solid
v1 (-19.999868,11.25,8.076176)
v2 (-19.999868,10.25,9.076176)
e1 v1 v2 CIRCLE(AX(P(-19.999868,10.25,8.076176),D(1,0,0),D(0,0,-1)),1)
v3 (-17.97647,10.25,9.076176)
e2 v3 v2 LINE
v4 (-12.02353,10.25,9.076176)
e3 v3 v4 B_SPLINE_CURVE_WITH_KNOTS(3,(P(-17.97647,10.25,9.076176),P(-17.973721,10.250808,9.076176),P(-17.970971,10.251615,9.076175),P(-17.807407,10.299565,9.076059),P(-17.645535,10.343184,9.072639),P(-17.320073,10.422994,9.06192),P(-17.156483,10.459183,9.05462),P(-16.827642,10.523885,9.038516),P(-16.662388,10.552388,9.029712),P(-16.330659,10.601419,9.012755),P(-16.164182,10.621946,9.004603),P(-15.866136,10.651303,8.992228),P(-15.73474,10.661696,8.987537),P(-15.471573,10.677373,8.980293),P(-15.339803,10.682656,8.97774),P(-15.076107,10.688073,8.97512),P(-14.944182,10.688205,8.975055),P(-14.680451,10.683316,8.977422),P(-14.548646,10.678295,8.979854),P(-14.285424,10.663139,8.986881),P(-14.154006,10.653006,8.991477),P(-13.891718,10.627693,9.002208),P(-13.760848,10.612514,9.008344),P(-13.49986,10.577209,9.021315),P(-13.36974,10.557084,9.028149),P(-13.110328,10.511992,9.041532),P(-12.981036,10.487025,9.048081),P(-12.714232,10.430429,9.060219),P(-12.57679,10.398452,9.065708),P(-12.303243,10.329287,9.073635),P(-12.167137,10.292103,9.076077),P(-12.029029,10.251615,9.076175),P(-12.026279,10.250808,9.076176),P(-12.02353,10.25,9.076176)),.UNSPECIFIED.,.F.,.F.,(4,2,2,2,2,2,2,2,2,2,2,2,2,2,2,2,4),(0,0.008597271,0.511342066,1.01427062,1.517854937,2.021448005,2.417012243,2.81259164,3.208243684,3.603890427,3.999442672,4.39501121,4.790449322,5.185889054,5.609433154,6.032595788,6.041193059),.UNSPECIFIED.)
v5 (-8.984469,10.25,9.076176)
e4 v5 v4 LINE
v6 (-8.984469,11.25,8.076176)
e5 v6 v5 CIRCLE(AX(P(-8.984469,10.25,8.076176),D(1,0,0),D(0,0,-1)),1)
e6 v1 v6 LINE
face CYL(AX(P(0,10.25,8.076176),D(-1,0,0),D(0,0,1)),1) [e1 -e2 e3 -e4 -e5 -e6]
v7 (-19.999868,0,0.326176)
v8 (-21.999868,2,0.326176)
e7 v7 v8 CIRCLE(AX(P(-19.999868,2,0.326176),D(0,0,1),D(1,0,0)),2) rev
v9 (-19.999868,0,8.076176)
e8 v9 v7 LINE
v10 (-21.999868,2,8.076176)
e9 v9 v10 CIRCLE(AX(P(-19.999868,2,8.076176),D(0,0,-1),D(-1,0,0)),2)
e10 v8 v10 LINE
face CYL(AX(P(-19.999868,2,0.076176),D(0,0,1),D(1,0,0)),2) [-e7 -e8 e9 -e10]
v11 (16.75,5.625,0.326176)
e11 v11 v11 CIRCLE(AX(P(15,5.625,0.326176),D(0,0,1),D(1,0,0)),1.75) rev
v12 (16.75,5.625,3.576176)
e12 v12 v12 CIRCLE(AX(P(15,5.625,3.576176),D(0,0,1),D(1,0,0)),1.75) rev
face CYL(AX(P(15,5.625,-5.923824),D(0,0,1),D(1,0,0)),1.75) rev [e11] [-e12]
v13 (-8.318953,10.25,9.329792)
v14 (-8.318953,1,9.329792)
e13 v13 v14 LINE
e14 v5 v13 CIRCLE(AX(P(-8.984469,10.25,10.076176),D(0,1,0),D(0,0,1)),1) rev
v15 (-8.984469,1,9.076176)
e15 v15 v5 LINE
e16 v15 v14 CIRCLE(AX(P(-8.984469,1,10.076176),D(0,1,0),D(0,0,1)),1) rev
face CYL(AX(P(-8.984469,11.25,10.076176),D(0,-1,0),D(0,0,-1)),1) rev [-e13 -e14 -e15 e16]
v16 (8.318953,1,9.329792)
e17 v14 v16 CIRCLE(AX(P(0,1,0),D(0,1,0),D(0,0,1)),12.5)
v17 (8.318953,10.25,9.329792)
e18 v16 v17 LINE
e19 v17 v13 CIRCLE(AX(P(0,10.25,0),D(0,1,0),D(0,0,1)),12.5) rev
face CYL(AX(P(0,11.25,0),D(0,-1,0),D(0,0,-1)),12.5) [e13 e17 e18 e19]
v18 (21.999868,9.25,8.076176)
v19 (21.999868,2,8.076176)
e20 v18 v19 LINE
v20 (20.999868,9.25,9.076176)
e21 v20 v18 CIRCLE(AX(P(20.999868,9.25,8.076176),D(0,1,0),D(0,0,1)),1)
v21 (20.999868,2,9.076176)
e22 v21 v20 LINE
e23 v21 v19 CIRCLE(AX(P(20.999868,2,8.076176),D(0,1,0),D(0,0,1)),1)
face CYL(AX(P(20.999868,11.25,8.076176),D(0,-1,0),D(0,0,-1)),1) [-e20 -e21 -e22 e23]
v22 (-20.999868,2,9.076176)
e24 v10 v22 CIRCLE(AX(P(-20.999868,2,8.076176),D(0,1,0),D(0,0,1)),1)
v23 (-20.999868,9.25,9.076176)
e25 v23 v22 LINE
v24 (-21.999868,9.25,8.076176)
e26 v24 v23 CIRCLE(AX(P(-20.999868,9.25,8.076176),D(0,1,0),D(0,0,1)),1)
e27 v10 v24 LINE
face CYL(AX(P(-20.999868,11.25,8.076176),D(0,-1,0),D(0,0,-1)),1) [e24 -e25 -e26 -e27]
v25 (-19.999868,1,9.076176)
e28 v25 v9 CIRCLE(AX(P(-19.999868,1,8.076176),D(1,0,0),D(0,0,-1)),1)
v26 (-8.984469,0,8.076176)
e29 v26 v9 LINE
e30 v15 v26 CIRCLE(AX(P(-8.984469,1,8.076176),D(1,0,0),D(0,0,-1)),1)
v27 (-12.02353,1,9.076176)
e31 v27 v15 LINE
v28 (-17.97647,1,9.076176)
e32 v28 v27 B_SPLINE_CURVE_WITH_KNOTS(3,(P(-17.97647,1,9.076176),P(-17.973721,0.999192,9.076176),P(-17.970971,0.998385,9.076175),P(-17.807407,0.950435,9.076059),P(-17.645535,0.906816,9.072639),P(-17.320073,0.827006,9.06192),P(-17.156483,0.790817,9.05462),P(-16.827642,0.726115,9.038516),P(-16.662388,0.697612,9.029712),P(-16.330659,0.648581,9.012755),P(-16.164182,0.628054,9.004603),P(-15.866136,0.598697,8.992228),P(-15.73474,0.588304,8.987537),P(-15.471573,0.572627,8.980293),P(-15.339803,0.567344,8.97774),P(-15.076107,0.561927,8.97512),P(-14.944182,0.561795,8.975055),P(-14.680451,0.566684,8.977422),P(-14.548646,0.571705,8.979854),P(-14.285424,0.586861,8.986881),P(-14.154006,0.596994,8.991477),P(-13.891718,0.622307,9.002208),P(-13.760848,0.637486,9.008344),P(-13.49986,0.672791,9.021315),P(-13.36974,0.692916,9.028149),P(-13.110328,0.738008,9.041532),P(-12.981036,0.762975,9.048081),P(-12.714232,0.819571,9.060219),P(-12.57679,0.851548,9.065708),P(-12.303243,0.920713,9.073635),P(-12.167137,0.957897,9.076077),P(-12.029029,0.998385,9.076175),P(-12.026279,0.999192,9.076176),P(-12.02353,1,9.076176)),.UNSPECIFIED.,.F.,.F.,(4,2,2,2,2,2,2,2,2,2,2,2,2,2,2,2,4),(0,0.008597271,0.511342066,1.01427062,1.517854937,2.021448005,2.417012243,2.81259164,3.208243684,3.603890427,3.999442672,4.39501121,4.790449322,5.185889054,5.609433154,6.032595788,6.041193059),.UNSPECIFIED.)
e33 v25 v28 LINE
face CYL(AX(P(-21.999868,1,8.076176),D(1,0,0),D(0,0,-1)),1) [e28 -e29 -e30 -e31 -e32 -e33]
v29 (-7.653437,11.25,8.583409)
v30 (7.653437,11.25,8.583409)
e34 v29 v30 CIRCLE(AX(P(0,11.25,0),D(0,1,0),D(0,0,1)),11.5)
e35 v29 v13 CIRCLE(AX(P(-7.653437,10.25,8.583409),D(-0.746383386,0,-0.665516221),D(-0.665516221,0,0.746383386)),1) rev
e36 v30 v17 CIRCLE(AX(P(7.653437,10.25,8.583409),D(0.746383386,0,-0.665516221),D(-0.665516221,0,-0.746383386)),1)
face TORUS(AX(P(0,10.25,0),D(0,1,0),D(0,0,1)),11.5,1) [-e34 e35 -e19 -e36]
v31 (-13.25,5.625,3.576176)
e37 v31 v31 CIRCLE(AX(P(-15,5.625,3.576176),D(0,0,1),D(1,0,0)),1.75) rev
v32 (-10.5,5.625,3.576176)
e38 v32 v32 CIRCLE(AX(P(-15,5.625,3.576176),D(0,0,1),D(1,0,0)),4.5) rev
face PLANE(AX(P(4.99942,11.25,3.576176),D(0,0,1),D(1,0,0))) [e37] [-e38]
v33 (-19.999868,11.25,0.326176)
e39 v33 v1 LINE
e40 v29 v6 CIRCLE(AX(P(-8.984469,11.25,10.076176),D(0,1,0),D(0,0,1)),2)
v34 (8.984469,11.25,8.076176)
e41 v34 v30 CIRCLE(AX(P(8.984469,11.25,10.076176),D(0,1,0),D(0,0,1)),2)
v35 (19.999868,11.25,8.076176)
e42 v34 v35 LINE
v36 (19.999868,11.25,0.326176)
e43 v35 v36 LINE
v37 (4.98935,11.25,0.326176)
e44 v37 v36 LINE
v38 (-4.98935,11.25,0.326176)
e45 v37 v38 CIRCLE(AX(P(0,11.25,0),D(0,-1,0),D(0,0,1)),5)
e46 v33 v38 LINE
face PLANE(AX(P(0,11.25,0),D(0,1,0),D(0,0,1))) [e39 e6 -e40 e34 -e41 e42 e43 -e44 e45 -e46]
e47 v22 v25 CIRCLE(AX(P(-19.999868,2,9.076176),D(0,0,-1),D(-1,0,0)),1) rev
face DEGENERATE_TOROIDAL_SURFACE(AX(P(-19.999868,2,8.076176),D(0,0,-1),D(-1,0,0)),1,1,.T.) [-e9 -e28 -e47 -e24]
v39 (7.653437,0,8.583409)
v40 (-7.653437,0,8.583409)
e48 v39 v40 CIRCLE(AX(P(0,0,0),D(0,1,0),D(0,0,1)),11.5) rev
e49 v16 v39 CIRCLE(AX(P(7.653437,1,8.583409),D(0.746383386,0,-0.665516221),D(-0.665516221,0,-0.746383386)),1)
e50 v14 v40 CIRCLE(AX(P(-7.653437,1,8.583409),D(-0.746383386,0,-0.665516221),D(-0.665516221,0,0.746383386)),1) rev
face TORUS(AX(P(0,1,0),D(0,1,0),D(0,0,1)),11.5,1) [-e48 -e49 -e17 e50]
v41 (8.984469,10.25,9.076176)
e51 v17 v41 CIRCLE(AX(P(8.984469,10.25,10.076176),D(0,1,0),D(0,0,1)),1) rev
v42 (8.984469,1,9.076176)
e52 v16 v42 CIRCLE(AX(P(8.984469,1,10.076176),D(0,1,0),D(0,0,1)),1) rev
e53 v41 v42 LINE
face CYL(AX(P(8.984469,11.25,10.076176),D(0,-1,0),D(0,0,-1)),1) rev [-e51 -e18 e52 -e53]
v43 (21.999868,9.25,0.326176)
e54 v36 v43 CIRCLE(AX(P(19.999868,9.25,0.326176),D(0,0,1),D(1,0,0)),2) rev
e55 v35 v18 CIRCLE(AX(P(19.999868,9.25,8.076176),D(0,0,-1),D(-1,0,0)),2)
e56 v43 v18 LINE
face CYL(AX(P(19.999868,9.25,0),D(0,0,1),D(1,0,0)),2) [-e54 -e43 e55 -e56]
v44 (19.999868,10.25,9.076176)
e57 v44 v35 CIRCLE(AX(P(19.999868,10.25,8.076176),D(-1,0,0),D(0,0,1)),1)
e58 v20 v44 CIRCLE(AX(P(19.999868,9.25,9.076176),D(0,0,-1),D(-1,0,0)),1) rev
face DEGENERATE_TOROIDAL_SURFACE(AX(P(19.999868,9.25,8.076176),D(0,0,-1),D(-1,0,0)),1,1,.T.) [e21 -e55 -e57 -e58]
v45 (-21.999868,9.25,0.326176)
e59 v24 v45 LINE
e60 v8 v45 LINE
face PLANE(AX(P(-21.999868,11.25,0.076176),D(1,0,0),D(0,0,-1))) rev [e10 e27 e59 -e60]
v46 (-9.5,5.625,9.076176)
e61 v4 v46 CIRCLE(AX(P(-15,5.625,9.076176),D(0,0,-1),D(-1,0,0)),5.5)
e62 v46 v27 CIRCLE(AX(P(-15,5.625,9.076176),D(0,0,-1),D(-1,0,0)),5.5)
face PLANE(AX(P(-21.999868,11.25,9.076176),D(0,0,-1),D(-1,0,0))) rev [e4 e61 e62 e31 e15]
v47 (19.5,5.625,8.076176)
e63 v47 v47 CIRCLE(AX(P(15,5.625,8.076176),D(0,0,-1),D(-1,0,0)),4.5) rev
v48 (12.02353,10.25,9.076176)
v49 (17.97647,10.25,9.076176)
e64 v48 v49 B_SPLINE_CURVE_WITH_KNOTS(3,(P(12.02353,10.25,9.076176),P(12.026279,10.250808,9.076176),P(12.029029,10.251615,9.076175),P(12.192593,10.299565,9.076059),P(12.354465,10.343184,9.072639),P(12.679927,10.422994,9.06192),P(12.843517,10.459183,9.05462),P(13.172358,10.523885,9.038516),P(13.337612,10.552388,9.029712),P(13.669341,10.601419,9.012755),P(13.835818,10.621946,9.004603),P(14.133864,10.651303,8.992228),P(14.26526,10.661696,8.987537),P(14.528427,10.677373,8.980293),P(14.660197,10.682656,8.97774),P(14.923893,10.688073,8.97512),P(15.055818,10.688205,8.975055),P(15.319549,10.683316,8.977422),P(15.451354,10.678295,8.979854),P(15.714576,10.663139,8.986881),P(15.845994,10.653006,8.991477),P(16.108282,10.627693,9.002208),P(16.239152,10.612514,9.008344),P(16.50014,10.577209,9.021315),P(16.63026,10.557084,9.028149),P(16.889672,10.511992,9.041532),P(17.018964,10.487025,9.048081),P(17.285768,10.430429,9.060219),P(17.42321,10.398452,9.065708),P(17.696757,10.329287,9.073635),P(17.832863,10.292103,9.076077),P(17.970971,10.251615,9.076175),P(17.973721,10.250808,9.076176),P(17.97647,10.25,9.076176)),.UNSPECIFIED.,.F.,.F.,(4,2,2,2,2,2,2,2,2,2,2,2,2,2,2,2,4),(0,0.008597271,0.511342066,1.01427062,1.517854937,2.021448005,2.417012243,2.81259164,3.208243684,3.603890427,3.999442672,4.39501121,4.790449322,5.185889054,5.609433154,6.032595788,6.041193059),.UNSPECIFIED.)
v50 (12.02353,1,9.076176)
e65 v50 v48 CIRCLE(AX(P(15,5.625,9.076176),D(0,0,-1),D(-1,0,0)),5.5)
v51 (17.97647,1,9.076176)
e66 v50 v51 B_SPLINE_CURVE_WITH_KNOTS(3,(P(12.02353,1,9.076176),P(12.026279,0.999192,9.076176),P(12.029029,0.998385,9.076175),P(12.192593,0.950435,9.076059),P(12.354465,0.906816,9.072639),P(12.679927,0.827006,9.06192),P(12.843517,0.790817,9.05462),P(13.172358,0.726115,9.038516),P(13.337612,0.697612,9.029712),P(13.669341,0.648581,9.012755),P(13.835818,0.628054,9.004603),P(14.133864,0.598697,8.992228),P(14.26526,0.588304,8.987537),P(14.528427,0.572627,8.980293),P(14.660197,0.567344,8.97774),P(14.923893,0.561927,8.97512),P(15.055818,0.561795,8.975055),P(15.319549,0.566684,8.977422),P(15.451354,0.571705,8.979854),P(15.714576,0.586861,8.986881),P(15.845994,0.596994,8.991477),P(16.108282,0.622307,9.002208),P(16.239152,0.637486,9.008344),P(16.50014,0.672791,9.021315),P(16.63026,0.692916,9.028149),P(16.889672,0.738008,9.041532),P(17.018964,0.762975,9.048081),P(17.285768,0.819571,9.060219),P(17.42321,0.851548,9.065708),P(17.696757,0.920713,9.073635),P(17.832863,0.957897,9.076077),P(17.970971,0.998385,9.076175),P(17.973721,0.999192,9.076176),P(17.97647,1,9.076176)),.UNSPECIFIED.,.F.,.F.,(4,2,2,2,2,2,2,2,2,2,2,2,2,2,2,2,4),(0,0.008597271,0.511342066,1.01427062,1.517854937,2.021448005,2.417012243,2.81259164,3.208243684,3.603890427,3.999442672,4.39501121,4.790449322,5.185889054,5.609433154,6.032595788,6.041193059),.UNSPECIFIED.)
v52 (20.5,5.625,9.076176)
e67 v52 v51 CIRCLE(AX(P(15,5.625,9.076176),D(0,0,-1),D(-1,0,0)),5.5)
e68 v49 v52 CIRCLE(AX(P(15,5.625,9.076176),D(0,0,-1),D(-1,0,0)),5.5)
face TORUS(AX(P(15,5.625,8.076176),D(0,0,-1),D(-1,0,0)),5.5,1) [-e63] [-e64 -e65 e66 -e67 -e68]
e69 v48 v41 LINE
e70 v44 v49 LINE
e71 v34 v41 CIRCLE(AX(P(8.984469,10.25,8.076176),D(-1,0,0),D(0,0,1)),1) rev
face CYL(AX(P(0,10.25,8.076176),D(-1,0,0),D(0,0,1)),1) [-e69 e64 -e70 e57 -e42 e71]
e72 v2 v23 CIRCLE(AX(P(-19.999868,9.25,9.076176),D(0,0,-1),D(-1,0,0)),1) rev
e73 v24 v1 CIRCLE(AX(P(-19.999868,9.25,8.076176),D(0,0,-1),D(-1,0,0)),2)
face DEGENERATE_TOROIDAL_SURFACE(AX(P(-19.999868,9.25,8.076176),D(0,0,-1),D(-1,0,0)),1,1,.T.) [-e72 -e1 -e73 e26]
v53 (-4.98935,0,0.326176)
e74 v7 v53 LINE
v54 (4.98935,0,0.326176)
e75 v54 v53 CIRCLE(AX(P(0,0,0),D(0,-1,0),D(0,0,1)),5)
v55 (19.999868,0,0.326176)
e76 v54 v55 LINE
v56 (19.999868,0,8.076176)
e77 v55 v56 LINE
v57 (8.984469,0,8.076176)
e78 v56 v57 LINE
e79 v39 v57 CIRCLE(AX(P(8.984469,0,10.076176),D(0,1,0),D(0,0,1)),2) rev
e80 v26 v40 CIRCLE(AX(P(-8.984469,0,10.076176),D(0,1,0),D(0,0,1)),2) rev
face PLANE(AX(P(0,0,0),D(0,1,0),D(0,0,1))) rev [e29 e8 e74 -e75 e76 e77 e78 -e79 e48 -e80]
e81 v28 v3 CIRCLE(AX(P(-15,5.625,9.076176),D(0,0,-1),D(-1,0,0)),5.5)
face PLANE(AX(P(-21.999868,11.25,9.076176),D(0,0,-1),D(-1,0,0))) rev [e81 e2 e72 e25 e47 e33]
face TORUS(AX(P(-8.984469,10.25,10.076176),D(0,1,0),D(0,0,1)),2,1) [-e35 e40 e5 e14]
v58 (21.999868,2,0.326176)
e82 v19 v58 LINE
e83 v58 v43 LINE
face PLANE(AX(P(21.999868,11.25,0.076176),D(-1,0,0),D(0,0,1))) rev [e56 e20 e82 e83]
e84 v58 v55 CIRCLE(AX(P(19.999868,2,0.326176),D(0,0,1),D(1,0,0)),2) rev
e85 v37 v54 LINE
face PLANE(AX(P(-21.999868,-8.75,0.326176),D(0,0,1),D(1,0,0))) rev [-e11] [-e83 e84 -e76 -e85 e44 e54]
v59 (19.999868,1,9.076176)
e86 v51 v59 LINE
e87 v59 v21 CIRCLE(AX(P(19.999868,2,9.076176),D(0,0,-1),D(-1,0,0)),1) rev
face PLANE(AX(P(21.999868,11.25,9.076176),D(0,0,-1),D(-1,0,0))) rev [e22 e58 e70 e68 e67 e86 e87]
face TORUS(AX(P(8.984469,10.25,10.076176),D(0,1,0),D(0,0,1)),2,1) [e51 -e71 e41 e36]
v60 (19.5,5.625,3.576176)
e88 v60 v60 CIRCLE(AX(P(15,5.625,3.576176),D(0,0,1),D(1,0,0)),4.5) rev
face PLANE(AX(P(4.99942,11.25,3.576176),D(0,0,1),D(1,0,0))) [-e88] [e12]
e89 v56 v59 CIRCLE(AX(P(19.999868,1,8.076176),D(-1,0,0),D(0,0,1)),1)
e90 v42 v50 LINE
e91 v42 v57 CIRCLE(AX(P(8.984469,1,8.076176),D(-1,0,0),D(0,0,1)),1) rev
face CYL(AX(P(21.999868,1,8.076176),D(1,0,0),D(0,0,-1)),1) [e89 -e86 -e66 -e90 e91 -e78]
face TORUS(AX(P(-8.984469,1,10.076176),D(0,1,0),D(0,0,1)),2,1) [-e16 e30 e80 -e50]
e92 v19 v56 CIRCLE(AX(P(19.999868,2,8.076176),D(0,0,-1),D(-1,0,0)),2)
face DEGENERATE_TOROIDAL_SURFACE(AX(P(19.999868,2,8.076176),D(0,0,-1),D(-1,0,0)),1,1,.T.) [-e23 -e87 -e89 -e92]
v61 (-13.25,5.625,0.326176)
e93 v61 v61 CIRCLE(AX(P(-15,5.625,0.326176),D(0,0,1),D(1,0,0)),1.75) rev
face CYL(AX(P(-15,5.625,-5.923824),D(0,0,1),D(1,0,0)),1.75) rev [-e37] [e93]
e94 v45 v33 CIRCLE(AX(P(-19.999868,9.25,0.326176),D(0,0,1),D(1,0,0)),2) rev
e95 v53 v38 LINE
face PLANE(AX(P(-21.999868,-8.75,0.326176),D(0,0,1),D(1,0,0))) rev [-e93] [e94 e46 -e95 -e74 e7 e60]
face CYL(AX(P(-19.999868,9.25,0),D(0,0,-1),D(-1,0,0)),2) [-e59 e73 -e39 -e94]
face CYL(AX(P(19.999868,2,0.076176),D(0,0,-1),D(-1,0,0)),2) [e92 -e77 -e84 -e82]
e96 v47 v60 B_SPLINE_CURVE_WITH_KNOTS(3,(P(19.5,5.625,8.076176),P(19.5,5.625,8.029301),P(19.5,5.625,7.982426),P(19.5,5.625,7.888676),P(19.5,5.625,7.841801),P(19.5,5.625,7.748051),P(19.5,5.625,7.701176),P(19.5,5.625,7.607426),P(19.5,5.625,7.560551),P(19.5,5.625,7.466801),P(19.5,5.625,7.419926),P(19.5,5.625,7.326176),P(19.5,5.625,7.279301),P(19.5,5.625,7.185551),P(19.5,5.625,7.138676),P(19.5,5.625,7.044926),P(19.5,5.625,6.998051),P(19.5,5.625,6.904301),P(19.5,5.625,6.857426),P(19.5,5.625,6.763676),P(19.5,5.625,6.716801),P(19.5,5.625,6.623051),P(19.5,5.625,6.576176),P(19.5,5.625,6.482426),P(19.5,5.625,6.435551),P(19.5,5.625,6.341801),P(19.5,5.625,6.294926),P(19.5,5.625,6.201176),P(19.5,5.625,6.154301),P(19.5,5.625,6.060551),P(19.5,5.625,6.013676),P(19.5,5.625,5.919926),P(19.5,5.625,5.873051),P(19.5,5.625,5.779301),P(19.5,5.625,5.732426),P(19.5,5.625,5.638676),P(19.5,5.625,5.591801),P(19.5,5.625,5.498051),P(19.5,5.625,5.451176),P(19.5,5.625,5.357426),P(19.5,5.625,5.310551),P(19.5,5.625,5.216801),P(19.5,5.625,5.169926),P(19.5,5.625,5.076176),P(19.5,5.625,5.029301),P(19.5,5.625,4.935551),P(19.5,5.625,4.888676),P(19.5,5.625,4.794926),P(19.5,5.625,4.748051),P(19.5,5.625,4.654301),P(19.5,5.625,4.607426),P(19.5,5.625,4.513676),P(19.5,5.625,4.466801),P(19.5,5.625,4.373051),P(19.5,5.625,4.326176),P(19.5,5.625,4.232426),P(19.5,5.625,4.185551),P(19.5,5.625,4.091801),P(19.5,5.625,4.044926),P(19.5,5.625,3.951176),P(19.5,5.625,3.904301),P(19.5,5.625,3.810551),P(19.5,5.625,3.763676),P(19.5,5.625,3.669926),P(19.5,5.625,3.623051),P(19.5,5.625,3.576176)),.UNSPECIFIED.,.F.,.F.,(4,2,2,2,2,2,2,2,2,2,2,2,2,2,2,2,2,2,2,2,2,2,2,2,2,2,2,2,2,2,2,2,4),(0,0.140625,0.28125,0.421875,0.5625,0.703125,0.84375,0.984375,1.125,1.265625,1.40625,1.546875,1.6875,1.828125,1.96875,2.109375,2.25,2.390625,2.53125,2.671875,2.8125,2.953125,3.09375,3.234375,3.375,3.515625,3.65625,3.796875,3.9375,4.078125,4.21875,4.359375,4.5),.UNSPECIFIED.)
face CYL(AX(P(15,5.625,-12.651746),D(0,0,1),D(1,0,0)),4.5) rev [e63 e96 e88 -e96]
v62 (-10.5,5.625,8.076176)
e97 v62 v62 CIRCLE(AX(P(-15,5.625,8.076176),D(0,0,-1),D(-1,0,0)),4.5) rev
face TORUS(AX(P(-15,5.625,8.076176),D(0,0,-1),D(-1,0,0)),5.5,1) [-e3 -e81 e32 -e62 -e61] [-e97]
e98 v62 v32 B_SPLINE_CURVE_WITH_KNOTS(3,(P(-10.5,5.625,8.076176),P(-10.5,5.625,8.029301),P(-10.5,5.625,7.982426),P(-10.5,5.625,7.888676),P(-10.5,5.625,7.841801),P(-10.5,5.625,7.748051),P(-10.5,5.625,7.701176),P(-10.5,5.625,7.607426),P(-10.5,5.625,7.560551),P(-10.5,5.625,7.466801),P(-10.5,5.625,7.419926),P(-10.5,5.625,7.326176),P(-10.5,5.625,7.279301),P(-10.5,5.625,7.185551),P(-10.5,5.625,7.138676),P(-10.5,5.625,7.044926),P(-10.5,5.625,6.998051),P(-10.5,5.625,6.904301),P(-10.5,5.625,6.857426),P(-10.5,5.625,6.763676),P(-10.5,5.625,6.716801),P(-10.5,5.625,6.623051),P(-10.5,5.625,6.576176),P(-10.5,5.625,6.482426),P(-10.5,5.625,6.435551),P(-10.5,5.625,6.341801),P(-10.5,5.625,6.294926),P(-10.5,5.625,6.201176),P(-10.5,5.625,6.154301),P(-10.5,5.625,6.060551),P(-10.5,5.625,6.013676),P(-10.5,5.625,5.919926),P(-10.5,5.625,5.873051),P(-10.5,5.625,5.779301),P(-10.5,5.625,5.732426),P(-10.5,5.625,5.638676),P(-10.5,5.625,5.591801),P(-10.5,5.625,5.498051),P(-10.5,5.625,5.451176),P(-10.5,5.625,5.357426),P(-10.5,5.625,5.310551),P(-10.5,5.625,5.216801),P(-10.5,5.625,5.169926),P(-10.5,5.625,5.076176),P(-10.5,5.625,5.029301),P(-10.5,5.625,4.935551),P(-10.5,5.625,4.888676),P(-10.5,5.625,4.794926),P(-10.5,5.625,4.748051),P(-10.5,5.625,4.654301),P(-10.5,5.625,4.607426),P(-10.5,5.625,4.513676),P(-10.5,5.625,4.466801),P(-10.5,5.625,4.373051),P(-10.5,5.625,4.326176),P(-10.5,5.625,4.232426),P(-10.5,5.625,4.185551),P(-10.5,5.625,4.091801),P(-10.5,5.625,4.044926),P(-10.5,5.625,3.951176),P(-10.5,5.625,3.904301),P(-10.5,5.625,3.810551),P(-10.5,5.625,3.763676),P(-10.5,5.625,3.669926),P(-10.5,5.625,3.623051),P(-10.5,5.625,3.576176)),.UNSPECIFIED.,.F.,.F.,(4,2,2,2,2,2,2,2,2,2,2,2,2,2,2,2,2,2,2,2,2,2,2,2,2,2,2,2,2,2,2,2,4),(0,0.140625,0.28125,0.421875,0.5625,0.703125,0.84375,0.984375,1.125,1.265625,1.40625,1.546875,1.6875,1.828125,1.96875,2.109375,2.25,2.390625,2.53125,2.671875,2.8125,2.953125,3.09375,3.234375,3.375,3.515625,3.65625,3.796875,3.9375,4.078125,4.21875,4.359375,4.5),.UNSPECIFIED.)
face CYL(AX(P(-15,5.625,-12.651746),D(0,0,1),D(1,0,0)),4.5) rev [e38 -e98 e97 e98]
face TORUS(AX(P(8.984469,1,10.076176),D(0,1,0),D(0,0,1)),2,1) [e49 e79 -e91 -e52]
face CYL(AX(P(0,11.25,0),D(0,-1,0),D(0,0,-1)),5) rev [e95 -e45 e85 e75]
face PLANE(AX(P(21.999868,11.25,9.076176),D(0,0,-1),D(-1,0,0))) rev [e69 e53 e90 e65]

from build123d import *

# Parameters (mm, degrees)
BOSS_EXTRUDE2_DEPTH = 11.25
SKETCH3_R           = 1.75
CUT_EXTRUDE1_DEPTH  = 15
SKETCH4_R           = 4.5
CUT_EXTRUDE2_DEPTH  = 5.5
FILLET1_R           = 2
FILLET2_R           = 1
SKETCH5_W           = 43.999736238
SKETCH5_H           = 0.25
CUT_EXTRUDE3_DEPTH  = 20


with BuildPart() as part:
    # Sketch2 → Boss-Extrude2 (new body)
    with BuildSketch(Plane(origin=(0, 0, 0), x_dir=(1, 0, 0), z_dir=(0, 1, 0))):
        with BuildLine():
            Line((4.999419692, -0.076175713), (21.999868119, -0.076175713))
            Line((21.999868119, -0.076175713), (21.999868119, -9.076175713))
            Line((21.999868119, -9.076175713), (8.594942375, -9.076175713))
            ThreePointArc((8.594942375, -9.076175713), (0, -12.5), (-8.594942375, -9.076175713))
            Line((-8.594942375, -9.076175713), (-21.999868119, -9.076175713))
            Line((-21.999868119, -9.076175713), (-21.999868119, -0.076175713))
            Line((-21.999868119, -0.076175713), (-4.999419692, -0.076175713))
            ThreePointArc((-4.999419692, -0.076175713), (0, -5), (4.999419692, -0.076175713))
        make_face()
    extrude(amount=BOSS_EXTRUDE2_DEPTH)

    # Sketch3 → Cut-Extrude1 (cut)
    with BuildSketch(Plane.XY.offset(9.076175713)):
        with Locations((15, 5.625)):
            Circle(SKETCH3_R)
        with Locations((-15, 5.625)):
            Circle(SKETCH3_R)
    extrude(amount=-CUT_EXTRUDE1_DEPTH, mode=Mode.SUBTRACT)

    # Sketch4 → Cut-Extrude2 (cut)
    with BuildSketch(Plane.XY.offset(9.076175713)):
        with Locations((15, 5.625)):
            Circle(SKETCH4_R)
        with Locations((-15, 5.625)):
            Circle(SKETCH4_R)
    extrude(amount=-CUT_EXTRUDE2_DEPTH, mode=Mode.SUBTRACT)

    # Fillet1
    fillet1_edges = [part.edges().sort_by_distance(p)[0] for p in [
        (-21.999868119, 11.25, 4.576175713),
        (21.999868119, 11.25, 4.576175713),
        (21.999868119, 0, 4.576175713),
        (-21.999868119, 0, 4.576175713),
    ]]
    fillet(fillet1_edges, radius=FILLET1_R)

    # Fillet2
    # the kernel refuses this fillet: 1 mm, written as the material it adds along each edge
    with BuildSketch(Plane(origin=(8.594942375, 0, 9.076175713), x_dir=(-0.7363214838652496, 0, 0.6766318588408892), z_dir=(0, 1, 0))) as fillet2_piece_1:
        with BuildLine():
            CenterArc((0.389815045, 0.9998876), FILLET2_R, 227.418998023, 41.721940681)
            Line((-0.286816814, 0.263566116), (0, 0))
            ThreePointArc((0, 0), (0.187411079, 0.001404995), (0.374822159, 0))
        make_face()
    extrude(amount=11.25)
    with BuildSketch(Plane(origin=(-8.594942375, 0, 9.076175713), x_dir=(-1, 0, 0), z_dir=(0, 1, 0))) as fillet2_piece_2:
        with BuildLine():
            CenterArc((0.389526613, 1), FILLET2_R, 228.278059319, 41.721940681)
            ThreePointArc((-0.275989608, 0.253616614), (-0.137044139, 0.127842835), (0, 0))
            Line((0, 0), (0.389526613, 0))
        make_face()
    extrude(amount=11.25)
    # the kernel refuses this fillet: 1 mm, written as the material it takes off along each edge
    with BuildSketch(Plane(origin=(15, 5.625, 9.076175713), x_dir=(1, 0, 0), z_dir=(0, -1, 0))) as fillet2_2_piece_1:
        with BuildLine():
            CenterArc((4.5 + FILLET2_R, -FILLET2_R), FILLET2_R, 90, 90)
            Line((4.5, -FILLET2_R), (4.5, 0))
            Line((4.5, 0), (4.5 + FILLET2_R, 0))
        make_face()
    revolve(axis=Axis((15, 5.625, 9.076175713), (0, 0, 1)), mode=Mode.SUBTRACT)
    with BuildSketch(Plane(origin=(-15, 5.625, 9.076175713), x_dir=(1, 0, 0), z_dir=(0, -1, 0))) as fillet2_2_piece_2:
        with BuildLine():
            CenterArc((4.5 + FILLET2_R, -FILLET2_R), FILLET2_R, 90, 90)
            Line((4.5, -FILLET2_R), (4.5, 0))
            Line((4.5, 0), (4.5 + FILLET2_R, 0))
        make_face()
    revolve(axis=Axis((-15, 5.625, 9.076175713), (0, 0, 1)), mode=Mode.SUBTRACT)
    # the kernel refuses this fillet: 1 mm, written as the material it takes off along each edge
    with BuildSketch(Plane(origin=(0, 11.25, 0), x_dir=(0.6655162213477791, 0, 0.7463833861514965), z_dir=(0.7463833861514965, 0, -0.6655162213477791))) as fillet2_3_piece_1:
        with BuildLine():
            CenterArc((12.5 - FILLET2_R, FILLET2_R), FILLET2_R, 270, 90)
            Line((12.5, FILLET2_R), (12.5, 0))
            Line((12.5, 0), (12.5 - FILLET2_R, 0))
        make_face()
    revolve(axis=Axis((0, 11.25, 0), (0, -1, 0)), revolution_arc=83.443881362, mode=Mode.SUBTRACT)
    with BuildSketch(Plane(origin=(19.999868119, 11.25, 9.076175713), x_dir=(0, 0, -1), z_dir=(-1, 0, 0)), Plane(origin=(-8.984468988, 0, 9.076175713), x_dir=(0, 1, 0), z_dir=(-1, 0, 0))) as fillet2_3_piece_2:
        with BuildLine():
            CenterArc((FILLET2_R, FILLET2_R), FILLET2_R, 180, 90)
            Line((0, FILLET2_R), (0, 0))
            Line((0, 0), (FILLET2_R, 0))
        make_face()
    extrude(amount=11.015399131, mode=Mode.SUBTRACT)
    with BuildSketch(Plane(origin=(21.999868119, 2, 9.076175713), x_dir=(-1, 0, 0), z_dir=(0, 1, 0))) as fillet2_3_piece_3:
        with BuildLine():
            CenterArc((FILLET2_R, -FILLET2_R), FILLET2_R, 90, 90)
            Line((0, -FILLET2_R), (0, 0))
            Line((0, 0), (FILLET2_R, 0))
        make_face()
    extrude(amount=7.25, mode=Mode.SUBTRACT)
    with BuildSketch(Plane(origin=(19.999868119, 9.25, 9.076175713), x_dir=(0, 1, 0), z_dir=(-1, 0, 0))) as fillet2_3_piece_4:
        with BuildLine():
            CenterArc((2 - FILLET2_R, FILLET2_R), FILLET2_R, 270, 90)
            Line((2, FILLET2_R), (2, 0))
            Line((2, 0), (2 - FILLET2_R, 0))
        make_face()
    revolve(axis=Axis((19.999868119, 9.25, 9.076175713), (0, 0, -1)), revolution_arc=90, mode=Mode.SUBTRACT)
    with BuildSketch(Plane(origin=(19.999868119, 2, 9.076175713), x_dir=(0, -1, 0), z_dir=(-1, 0, 0))) as fillet2_3_piece_5:
        with BuildLine():
            CenterArc((2 - FILLET2_R, -FILLET2_R), FILLET2_R, 0, 90)
            Line((2 - FILLET2_R, 0), (2, 0))
            Line((2, 0), (2, -FILLET2_R))
        make_face()
    revolve(axis=Axis((19.999868119, 2, 9.076175713), (0, 0, 1)), revolution_arc=90, mode=Mode.SUBTRACT)
    with BuildSketch(Plane(origin=(-8.984468988, 11.25, 9.076175713), x_dir=(0, -1, 0), z_dir=(-1, 0, 0)), Plane(origin=(19.999868119, 0, 9.076175713), x_dir=(0, 0, -1), z_dir=(-1, 0, 0))) as fillet2_3_piece_6:
        with BuildLine():
            CenterArc((FILLET2_R, -FILLET2_R), FILLET2_R, 90, 90)
            Line((0, -FILLET2_R), (0, 0))
            Line((0, 0), (FILLET2_R, 0))
        make_face()
    extrude(amount=11.015399131, mode=Mode.SUBTRACT)
    with BuildSketch(Plane(origin=(-21.999868119, 2, 9.076175713), x_dir=(1, 0, 0), z_dir=(0, 1, 0))) as fillet2_3_piece_7:
        with BuildLine():
            CenterArc((FILLET2_R, FILLET2_R), FILLET2_R, 180, 90)
            Line((0, FILLET2_R), (0, 0))
            Line((0, 0), (FILLET2_R, 0))
        make_face()
    extrude(amount=7.25, mode=Mode.SUBTRACT)
    with BuildSketch(Plane(origin=(-19.999868119, 9.25, 9.076175713), x_dir=(0, 1, 0), z_dir=(1, 0, 0))) as fillet2_3_piece_8:
        with BuildLine():
            CenterArc((2 - FILLET2_R, -FILLET2_R), FILLET2_R, 360, 90)
            Line((2, -FILLET2_R), (2, 0))
            Line((2, 0), (2 - FILLET2_R, 0))
        make_face()
    revolve(axis=Axis((-19.999868119, 9.25, 9.076175713), (0, 0, 1)), revolution_arc=90, mode=Mode.SUBTRACT)
    with BuildSketch(Plane(origin=(-19.999868119, 2, 9.076175713), x_dir=(0, -1, 0), z_dir=(1, 0, 0))) as fillet2_3_piece_9:
        with BuildLine():
            CenterArc((2 - FILLET2_R, FILLET2_R), FILLET2_R, 270, 90)
            Line((2, FILLET2_R), (2, 0))
            Line((2, 0), (2 - FILLET2_R, 0))
        make_face()
    revolve(axis=Axis((-19.999868119, 2, 9.076175713), (0, 0, -1)), revolution_arc=90, mode=Mode.SUBTRACT)
    with BuildSketch(Plane(origin=(0, 0, 0), x_dir=(0.6655162213477791, 0, 0.7463833861514965), z_dir=(0.7463833861514965, 0, -0.6655162213477791))) as fillet2_3_piece_10:
        with BuildLine():
            CenterArc((12.5 - FILLET2_R, -FILLET2_R), FILLET2_R, 0, 90)
            Line((12.5, -FILLET2_R), (12.5, 0))
            Line((12.5, 0), (12.5 - FILLET2_R, 0))
        make_face()
    revolve(axis=Axis((0, 0, 0), (0, -1, 0)), revolution_arc=83.443881362, mode=Mode.SUBTRACT)
    with BuildSketch(Plane(origin=(8.984468988, 0, 10.076175713), x_dir=(-0.6655162213477794, 0, -0.7463833861514964), z_dir=(-0.7463833861514964, 0, 0.6655162213477794))) as fillet2_3_piece_11:
        with BuildLine():
            CenterArc((1 + FILLET2_R, -FILLET2_R), FILLET2_R, 90, 90)
            Line((1, -FILLET2_R), (1, 0))
            Line((1, 0), (1 + FILLET2_R, 0))
        make_face()
    revolve(axis=Axis((8.984468988, 0, 10.076175713), (0, -1, 0)), revolution_arc=41.721940681, mode=Mode.SUBTRACT)
    with BuildSketch(Plane(origin=(-8.984468988, 0, 10.076175713), x_dir=(0, 0, -1), z_dir=(-1, 0, 0))) as fillet2_3_piece_12:
        with BuildLine():
            CenterArc((1 + FILLET2_R, -FILLET2_R), FILLET2_R, 90, 90)
            Line((1, -FILLET2_R), (1, 0))
            Line((1, 0), (1 + FILLET2_R, 0))
        make_face()
    revolve(axis=Axis((-8.984468988, 0, 10.076175713), (0, -1, 0)), revolution_arc=41.721940681, mode=Mode.SUBTRACT)
    with BuildSketch(Plane(origin=(-8.984468988, 11.25, 10.076175713), x_dir=(0, 0, -1), z_dir=(-1, 0, 0))) as fillet2_3_piece_13:
        with BuildLine():
            CenterArc((1 + FILLET2_R, FILLET2_R), FILLET2_R, 180, 90)
            Line((1 + FILLET2_R, 0), (1, 0))
            Line((1, 0), (1, FILLET2_R))
        make_face()
    revolve(axis=Axis((-8.984468988, 11.25, 10.076175713), (0, -1, 0)), revolution_arc=41.721940681, mode=Mode.SUBTRACT)
    with BuildSketch(Plane(origin=(8.984468988, 11.25, 10.076175713), x_dir=(-0.6655162213477794, 0, -0.7463833861514964), z_dir=(-0.7463833861514964, 0, 0.6655162213477794))) as fillet2_3_piece_14:
        with BuildLine():
            CenterArc((1 + FILLET2_R, FILLET2_R), FILLET2_R, 180, 90)
            Line((1, FILLET2_R), (1, 0))
            Line((1, 0), (1 + FILLET2_R, 0))
        make_face()
    revolve(axis=Axis((8.984468988, 11.25, 10.076175713), (0, -1, 0)), revolution_arc=41.721940681, mode=Mode.SUBTRACT)

    # Sketch5 → Cut-Extrude3 (cut)
    with BuildSketch(Plane(origin=(0, 11.25, 0), x_dir=(1, 0, 0), z_dir=(0, 1, 0))):
        with Locations((0, -0.201175713)):
            Rectangle(SKETCH5_W, SKETCH5_H)
    extrude(amount=-CUT_EXTRUDE3_DEPTH, mode=Mode.SUBTRACT)


solid = part.part
